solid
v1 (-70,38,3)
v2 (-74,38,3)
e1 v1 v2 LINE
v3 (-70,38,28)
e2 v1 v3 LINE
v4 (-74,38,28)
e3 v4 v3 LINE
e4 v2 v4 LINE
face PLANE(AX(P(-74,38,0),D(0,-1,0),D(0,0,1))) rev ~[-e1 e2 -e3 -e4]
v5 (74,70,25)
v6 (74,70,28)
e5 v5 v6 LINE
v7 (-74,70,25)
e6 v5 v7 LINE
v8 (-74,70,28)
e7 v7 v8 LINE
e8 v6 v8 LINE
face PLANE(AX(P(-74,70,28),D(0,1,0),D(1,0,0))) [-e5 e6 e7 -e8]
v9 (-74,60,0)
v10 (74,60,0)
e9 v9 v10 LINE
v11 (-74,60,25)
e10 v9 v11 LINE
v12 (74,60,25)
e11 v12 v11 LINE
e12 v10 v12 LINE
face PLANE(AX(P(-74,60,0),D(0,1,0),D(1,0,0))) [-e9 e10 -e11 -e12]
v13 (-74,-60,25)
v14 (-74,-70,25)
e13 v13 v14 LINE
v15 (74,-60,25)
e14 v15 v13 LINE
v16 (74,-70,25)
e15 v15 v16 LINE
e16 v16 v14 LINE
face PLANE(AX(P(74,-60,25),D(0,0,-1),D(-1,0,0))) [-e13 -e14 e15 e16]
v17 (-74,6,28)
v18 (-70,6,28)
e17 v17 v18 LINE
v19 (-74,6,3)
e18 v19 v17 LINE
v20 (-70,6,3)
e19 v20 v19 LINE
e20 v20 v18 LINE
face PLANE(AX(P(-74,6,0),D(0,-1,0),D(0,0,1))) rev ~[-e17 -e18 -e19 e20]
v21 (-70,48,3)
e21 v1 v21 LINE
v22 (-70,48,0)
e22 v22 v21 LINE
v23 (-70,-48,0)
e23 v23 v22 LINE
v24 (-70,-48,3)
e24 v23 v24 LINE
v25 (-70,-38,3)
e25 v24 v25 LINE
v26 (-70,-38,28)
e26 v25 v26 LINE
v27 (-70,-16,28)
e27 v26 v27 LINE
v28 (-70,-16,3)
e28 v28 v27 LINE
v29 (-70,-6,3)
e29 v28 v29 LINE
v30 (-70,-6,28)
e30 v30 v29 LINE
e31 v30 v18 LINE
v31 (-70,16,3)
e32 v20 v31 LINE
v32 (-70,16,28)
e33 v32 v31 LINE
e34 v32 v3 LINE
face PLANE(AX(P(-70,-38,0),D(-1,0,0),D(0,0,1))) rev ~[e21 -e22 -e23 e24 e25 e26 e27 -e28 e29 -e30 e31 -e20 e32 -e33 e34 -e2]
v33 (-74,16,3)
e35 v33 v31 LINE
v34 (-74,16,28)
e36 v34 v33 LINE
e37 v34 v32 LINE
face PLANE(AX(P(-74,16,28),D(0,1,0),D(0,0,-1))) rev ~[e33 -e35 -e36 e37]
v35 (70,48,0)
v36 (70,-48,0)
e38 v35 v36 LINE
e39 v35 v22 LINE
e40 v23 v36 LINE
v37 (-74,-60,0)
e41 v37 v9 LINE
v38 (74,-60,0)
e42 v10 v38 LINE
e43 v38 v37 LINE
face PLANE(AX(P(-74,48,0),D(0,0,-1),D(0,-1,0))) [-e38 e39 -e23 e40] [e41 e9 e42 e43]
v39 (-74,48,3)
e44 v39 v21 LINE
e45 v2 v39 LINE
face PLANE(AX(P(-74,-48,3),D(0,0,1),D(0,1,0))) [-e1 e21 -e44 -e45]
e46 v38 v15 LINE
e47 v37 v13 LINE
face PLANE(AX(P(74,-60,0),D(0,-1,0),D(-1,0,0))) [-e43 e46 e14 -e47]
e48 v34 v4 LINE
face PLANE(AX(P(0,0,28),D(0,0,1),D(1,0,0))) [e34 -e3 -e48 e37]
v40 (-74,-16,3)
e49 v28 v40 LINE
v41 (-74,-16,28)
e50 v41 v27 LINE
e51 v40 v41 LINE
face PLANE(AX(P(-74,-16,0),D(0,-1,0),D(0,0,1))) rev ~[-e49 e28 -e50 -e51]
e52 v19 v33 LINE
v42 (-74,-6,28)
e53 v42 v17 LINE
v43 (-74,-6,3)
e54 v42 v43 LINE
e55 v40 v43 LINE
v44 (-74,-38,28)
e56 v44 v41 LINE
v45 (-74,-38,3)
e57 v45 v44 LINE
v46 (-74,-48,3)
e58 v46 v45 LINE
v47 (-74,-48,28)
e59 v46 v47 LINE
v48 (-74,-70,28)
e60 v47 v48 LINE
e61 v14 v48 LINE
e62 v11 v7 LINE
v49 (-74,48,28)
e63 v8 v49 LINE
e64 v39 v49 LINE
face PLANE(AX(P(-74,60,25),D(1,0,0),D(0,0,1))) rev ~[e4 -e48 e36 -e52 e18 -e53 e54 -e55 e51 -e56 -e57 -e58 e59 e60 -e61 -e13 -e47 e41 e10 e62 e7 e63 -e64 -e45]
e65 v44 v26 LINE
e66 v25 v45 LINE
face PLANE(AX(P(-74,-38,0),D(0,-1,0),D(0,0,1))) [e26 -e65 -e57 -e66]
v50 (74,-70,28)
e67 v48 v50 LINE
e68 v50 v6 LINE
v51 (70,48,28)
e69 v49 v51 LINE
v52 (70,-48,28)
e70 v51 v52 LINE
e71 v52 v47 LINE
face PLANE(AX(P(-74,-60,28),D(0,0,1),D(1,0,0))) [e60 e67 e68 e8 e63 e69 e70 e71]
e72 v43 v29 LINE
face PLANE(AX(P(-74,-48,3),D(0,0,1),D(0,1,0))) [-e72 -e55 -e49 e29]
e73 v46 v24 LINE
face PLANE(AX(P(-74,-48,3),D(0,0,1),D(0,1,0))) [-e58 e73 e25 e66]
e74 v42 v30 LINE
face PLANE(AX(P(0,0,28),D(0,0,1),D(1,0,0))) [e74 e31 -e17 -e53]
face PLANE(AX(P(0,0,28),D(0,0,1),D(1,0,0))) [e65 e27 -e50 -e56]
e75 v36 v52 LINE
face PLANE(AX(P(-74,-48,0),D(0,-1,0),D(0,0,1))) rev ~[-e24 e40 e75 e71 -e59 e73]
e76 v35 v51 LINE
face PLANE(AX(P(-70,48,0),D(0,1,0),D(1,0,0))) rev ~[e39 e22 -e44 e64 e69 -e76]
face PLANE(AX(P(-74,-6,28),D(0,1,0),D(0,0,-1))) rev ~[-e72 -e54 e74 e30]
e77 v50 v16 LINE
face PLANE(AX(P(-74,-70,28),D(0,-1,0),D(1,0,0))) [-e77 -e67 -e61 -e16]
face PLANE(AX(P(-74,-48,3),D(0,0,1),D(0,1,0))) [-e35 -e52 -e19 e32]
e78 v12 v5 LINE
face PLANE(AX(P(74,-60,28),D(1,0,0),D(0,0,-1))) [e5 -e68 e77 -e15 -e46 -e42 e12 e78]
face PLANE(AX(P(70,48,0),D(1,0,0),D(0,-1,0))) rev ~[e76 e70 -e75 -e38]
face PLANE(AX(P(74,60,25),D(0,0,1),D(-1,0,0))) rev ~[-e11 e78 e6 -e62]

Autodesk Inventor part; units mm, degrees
ref_plane "YZ Plane" through (0, 0, 0) normal (1, 0, 0) x (0, 1, 0)
ref_plane "XZ Plane" through (0, 0, 0) normal (0, 1, 0) x (-1, 0, 0)
ref_plane "XY Plane" through (0, 0, 0) normal (0, 0, 1) x (1, 0, 0)
sketch "Esquisse1" plane through (0, 0, 0) normal (0, 0, 1) x (1, 0, 0)
  line L0 (-70, 48) -> (70, 48)
  line L1 (70, 48) -> (70, -48)
  line L2 (70, -48) -> (-70, -48)
  line L3 (-70, -48) -> (-70, 48)
  line L4 (74, -60) -> (-74, -60)
  line L5 (-74, -60) -> (-74, 60)
  line L6 (-74, 60) -> (74, 60)
  line L7 (74, 60) -> (74, -60)
  line L8 (74, -60) -> (-74, 60) construction
  line L9 (-74, -60) -> (74, 60) construction
  point P0 (0, 0)
  dimension "d0" = 48
  dimension "d1" = 48
  dimension "d2" = 70
  dimension "d3" = 70
  dimension "d4" = 60
  dimension "d5" = 74
extrude "Extrusion1" add sketch "Esquisse1" along normal blind 28
sketch "Esquisse3" plane through (-74, -60, 28) normal (-1, 0, 0) x (0, 0, 1)
  line L0 (-28, 108) -> (0, 108) projected
  line L1 (-28, 48) -> (-28, 4) projected
  line L2 (0, 108) -> (-28, 108)
  line L3 (-28, 108) -> (-28, 98)
  line L4 (-28, 98) -> (0, 98)
  line L5 (0, 98) -> (0, 108)
  line L6 (-28, 12) -> (0, 12) projected
  line L7 (0, 12) -> (-28, 12)
  line L8 (-28, 12) -> (-28, 22)
  line L9 (-28, 22) -> (0, 22)
  line L10 (0, 22) -> (0, 12)
  line L11 (-28, 12) -> (-28, 108) projected
  line L12 (0, 12) -> (0, 108) projected
  line L13 (-28, 44) -> (0, 44)
  line L14 (0, 44) -> (0, 54)
  line L15 (0, 54) -> (-28, 54)
  line L16 (-28, 54) -> (-28, 44)
  line L17 (-28, 66) -> (0, 66)
  line L18 (0, 66) -> (0, 76)
  line L19 (0, 76) -> (-28, 76)
  line L20 (-28, 76) -> (-28, 66)
  point P0 (-28, 60)
  point P1 (0, 12)
  point P2 (-28, 22)
  point P3 (0, 66)
  point P4 (0, 44)
  dimension "d10" = 10
  dimension "d11" = 10
  dimension "d12" = 28
  dimension "d13" = 28
  dimension "d29" = 42
  dimension "d30" = 42
  dimension "d31" = 10
  dimension "d32" = 10
extrude "Extrusion3" cut sketch "Esquisse3" against normal blind 10 contours L0 L5 L4 L3 | L19 L12 L17 L11 | L15 L12 L13 L1 L11 | L10 L6 L1 L9
sketch "Esquisse4" plane through (-74, 60, 28) normal (0, 1, 0) x (1, 0, 0)
  line L0 (148, 28) -> (148, 0) projected
  line L1 (144, 0) -> (4, 0) projected
  line L2 (148, 3) -> (0, 3)
  line L3 (0, 3) -> (0, 0)
  line L4 (0, 0) -> (148, 0)
  line L5 (148, 0) -> (148, 3)
  point P0 (74, 28)
  point P1 (148, 31)
  point P2 (148, 0)
  dimension "d21" = 3
extrude "Extrusion4" add sketch "Esquisse4" along normal blind 10
sketch "Esquisse5" plane through (-74, -60, 28) normal (0, -1, 0) x (1, 0, 0)
  line L0 (0, 0) -> (144, 0) projected
  line L1 (148, -28) -> (148, -3) projected
  line L2 (0, 0) -> (148, 0)
  line L3 (148, 0) -> (148, -3)
  line L4 (148, -3) -> (0, -3)
  line L5 (0, -3) -> (0, 0)
  point P0 (74, -28)
  point P1 (148, -31)
  point P2 (4, 0)
  point P3 (4, 0)
  dimension "d22" = 3
extrude "Extrusion5" add sketch "Esquisse5" along normal blind 10
sketch "Esquisse6" plane through (-74, -38, 0) normal (-1, 0, 0) x (0, 0, 1)
  line L0 (0, 86) -> (28, 86) projected
  line L1 (0, -10) -> (28, -10) projected
  line L2 (0, -10) -> (0, -22) projected
  line L3 (0, -10) -> (3, -10)
  line L4 (3, -10) -> (3, 86)
  line L5 (3, 86) -> (0, 86)
  line L6 (0, 86) -> (0, -10)
  point P0 (0, 38)
  dimension "d28" = 3
extrude "Extrusion6" add sketch "Esquisse6" against normal blind 4
properties part number "Support_batterie"
